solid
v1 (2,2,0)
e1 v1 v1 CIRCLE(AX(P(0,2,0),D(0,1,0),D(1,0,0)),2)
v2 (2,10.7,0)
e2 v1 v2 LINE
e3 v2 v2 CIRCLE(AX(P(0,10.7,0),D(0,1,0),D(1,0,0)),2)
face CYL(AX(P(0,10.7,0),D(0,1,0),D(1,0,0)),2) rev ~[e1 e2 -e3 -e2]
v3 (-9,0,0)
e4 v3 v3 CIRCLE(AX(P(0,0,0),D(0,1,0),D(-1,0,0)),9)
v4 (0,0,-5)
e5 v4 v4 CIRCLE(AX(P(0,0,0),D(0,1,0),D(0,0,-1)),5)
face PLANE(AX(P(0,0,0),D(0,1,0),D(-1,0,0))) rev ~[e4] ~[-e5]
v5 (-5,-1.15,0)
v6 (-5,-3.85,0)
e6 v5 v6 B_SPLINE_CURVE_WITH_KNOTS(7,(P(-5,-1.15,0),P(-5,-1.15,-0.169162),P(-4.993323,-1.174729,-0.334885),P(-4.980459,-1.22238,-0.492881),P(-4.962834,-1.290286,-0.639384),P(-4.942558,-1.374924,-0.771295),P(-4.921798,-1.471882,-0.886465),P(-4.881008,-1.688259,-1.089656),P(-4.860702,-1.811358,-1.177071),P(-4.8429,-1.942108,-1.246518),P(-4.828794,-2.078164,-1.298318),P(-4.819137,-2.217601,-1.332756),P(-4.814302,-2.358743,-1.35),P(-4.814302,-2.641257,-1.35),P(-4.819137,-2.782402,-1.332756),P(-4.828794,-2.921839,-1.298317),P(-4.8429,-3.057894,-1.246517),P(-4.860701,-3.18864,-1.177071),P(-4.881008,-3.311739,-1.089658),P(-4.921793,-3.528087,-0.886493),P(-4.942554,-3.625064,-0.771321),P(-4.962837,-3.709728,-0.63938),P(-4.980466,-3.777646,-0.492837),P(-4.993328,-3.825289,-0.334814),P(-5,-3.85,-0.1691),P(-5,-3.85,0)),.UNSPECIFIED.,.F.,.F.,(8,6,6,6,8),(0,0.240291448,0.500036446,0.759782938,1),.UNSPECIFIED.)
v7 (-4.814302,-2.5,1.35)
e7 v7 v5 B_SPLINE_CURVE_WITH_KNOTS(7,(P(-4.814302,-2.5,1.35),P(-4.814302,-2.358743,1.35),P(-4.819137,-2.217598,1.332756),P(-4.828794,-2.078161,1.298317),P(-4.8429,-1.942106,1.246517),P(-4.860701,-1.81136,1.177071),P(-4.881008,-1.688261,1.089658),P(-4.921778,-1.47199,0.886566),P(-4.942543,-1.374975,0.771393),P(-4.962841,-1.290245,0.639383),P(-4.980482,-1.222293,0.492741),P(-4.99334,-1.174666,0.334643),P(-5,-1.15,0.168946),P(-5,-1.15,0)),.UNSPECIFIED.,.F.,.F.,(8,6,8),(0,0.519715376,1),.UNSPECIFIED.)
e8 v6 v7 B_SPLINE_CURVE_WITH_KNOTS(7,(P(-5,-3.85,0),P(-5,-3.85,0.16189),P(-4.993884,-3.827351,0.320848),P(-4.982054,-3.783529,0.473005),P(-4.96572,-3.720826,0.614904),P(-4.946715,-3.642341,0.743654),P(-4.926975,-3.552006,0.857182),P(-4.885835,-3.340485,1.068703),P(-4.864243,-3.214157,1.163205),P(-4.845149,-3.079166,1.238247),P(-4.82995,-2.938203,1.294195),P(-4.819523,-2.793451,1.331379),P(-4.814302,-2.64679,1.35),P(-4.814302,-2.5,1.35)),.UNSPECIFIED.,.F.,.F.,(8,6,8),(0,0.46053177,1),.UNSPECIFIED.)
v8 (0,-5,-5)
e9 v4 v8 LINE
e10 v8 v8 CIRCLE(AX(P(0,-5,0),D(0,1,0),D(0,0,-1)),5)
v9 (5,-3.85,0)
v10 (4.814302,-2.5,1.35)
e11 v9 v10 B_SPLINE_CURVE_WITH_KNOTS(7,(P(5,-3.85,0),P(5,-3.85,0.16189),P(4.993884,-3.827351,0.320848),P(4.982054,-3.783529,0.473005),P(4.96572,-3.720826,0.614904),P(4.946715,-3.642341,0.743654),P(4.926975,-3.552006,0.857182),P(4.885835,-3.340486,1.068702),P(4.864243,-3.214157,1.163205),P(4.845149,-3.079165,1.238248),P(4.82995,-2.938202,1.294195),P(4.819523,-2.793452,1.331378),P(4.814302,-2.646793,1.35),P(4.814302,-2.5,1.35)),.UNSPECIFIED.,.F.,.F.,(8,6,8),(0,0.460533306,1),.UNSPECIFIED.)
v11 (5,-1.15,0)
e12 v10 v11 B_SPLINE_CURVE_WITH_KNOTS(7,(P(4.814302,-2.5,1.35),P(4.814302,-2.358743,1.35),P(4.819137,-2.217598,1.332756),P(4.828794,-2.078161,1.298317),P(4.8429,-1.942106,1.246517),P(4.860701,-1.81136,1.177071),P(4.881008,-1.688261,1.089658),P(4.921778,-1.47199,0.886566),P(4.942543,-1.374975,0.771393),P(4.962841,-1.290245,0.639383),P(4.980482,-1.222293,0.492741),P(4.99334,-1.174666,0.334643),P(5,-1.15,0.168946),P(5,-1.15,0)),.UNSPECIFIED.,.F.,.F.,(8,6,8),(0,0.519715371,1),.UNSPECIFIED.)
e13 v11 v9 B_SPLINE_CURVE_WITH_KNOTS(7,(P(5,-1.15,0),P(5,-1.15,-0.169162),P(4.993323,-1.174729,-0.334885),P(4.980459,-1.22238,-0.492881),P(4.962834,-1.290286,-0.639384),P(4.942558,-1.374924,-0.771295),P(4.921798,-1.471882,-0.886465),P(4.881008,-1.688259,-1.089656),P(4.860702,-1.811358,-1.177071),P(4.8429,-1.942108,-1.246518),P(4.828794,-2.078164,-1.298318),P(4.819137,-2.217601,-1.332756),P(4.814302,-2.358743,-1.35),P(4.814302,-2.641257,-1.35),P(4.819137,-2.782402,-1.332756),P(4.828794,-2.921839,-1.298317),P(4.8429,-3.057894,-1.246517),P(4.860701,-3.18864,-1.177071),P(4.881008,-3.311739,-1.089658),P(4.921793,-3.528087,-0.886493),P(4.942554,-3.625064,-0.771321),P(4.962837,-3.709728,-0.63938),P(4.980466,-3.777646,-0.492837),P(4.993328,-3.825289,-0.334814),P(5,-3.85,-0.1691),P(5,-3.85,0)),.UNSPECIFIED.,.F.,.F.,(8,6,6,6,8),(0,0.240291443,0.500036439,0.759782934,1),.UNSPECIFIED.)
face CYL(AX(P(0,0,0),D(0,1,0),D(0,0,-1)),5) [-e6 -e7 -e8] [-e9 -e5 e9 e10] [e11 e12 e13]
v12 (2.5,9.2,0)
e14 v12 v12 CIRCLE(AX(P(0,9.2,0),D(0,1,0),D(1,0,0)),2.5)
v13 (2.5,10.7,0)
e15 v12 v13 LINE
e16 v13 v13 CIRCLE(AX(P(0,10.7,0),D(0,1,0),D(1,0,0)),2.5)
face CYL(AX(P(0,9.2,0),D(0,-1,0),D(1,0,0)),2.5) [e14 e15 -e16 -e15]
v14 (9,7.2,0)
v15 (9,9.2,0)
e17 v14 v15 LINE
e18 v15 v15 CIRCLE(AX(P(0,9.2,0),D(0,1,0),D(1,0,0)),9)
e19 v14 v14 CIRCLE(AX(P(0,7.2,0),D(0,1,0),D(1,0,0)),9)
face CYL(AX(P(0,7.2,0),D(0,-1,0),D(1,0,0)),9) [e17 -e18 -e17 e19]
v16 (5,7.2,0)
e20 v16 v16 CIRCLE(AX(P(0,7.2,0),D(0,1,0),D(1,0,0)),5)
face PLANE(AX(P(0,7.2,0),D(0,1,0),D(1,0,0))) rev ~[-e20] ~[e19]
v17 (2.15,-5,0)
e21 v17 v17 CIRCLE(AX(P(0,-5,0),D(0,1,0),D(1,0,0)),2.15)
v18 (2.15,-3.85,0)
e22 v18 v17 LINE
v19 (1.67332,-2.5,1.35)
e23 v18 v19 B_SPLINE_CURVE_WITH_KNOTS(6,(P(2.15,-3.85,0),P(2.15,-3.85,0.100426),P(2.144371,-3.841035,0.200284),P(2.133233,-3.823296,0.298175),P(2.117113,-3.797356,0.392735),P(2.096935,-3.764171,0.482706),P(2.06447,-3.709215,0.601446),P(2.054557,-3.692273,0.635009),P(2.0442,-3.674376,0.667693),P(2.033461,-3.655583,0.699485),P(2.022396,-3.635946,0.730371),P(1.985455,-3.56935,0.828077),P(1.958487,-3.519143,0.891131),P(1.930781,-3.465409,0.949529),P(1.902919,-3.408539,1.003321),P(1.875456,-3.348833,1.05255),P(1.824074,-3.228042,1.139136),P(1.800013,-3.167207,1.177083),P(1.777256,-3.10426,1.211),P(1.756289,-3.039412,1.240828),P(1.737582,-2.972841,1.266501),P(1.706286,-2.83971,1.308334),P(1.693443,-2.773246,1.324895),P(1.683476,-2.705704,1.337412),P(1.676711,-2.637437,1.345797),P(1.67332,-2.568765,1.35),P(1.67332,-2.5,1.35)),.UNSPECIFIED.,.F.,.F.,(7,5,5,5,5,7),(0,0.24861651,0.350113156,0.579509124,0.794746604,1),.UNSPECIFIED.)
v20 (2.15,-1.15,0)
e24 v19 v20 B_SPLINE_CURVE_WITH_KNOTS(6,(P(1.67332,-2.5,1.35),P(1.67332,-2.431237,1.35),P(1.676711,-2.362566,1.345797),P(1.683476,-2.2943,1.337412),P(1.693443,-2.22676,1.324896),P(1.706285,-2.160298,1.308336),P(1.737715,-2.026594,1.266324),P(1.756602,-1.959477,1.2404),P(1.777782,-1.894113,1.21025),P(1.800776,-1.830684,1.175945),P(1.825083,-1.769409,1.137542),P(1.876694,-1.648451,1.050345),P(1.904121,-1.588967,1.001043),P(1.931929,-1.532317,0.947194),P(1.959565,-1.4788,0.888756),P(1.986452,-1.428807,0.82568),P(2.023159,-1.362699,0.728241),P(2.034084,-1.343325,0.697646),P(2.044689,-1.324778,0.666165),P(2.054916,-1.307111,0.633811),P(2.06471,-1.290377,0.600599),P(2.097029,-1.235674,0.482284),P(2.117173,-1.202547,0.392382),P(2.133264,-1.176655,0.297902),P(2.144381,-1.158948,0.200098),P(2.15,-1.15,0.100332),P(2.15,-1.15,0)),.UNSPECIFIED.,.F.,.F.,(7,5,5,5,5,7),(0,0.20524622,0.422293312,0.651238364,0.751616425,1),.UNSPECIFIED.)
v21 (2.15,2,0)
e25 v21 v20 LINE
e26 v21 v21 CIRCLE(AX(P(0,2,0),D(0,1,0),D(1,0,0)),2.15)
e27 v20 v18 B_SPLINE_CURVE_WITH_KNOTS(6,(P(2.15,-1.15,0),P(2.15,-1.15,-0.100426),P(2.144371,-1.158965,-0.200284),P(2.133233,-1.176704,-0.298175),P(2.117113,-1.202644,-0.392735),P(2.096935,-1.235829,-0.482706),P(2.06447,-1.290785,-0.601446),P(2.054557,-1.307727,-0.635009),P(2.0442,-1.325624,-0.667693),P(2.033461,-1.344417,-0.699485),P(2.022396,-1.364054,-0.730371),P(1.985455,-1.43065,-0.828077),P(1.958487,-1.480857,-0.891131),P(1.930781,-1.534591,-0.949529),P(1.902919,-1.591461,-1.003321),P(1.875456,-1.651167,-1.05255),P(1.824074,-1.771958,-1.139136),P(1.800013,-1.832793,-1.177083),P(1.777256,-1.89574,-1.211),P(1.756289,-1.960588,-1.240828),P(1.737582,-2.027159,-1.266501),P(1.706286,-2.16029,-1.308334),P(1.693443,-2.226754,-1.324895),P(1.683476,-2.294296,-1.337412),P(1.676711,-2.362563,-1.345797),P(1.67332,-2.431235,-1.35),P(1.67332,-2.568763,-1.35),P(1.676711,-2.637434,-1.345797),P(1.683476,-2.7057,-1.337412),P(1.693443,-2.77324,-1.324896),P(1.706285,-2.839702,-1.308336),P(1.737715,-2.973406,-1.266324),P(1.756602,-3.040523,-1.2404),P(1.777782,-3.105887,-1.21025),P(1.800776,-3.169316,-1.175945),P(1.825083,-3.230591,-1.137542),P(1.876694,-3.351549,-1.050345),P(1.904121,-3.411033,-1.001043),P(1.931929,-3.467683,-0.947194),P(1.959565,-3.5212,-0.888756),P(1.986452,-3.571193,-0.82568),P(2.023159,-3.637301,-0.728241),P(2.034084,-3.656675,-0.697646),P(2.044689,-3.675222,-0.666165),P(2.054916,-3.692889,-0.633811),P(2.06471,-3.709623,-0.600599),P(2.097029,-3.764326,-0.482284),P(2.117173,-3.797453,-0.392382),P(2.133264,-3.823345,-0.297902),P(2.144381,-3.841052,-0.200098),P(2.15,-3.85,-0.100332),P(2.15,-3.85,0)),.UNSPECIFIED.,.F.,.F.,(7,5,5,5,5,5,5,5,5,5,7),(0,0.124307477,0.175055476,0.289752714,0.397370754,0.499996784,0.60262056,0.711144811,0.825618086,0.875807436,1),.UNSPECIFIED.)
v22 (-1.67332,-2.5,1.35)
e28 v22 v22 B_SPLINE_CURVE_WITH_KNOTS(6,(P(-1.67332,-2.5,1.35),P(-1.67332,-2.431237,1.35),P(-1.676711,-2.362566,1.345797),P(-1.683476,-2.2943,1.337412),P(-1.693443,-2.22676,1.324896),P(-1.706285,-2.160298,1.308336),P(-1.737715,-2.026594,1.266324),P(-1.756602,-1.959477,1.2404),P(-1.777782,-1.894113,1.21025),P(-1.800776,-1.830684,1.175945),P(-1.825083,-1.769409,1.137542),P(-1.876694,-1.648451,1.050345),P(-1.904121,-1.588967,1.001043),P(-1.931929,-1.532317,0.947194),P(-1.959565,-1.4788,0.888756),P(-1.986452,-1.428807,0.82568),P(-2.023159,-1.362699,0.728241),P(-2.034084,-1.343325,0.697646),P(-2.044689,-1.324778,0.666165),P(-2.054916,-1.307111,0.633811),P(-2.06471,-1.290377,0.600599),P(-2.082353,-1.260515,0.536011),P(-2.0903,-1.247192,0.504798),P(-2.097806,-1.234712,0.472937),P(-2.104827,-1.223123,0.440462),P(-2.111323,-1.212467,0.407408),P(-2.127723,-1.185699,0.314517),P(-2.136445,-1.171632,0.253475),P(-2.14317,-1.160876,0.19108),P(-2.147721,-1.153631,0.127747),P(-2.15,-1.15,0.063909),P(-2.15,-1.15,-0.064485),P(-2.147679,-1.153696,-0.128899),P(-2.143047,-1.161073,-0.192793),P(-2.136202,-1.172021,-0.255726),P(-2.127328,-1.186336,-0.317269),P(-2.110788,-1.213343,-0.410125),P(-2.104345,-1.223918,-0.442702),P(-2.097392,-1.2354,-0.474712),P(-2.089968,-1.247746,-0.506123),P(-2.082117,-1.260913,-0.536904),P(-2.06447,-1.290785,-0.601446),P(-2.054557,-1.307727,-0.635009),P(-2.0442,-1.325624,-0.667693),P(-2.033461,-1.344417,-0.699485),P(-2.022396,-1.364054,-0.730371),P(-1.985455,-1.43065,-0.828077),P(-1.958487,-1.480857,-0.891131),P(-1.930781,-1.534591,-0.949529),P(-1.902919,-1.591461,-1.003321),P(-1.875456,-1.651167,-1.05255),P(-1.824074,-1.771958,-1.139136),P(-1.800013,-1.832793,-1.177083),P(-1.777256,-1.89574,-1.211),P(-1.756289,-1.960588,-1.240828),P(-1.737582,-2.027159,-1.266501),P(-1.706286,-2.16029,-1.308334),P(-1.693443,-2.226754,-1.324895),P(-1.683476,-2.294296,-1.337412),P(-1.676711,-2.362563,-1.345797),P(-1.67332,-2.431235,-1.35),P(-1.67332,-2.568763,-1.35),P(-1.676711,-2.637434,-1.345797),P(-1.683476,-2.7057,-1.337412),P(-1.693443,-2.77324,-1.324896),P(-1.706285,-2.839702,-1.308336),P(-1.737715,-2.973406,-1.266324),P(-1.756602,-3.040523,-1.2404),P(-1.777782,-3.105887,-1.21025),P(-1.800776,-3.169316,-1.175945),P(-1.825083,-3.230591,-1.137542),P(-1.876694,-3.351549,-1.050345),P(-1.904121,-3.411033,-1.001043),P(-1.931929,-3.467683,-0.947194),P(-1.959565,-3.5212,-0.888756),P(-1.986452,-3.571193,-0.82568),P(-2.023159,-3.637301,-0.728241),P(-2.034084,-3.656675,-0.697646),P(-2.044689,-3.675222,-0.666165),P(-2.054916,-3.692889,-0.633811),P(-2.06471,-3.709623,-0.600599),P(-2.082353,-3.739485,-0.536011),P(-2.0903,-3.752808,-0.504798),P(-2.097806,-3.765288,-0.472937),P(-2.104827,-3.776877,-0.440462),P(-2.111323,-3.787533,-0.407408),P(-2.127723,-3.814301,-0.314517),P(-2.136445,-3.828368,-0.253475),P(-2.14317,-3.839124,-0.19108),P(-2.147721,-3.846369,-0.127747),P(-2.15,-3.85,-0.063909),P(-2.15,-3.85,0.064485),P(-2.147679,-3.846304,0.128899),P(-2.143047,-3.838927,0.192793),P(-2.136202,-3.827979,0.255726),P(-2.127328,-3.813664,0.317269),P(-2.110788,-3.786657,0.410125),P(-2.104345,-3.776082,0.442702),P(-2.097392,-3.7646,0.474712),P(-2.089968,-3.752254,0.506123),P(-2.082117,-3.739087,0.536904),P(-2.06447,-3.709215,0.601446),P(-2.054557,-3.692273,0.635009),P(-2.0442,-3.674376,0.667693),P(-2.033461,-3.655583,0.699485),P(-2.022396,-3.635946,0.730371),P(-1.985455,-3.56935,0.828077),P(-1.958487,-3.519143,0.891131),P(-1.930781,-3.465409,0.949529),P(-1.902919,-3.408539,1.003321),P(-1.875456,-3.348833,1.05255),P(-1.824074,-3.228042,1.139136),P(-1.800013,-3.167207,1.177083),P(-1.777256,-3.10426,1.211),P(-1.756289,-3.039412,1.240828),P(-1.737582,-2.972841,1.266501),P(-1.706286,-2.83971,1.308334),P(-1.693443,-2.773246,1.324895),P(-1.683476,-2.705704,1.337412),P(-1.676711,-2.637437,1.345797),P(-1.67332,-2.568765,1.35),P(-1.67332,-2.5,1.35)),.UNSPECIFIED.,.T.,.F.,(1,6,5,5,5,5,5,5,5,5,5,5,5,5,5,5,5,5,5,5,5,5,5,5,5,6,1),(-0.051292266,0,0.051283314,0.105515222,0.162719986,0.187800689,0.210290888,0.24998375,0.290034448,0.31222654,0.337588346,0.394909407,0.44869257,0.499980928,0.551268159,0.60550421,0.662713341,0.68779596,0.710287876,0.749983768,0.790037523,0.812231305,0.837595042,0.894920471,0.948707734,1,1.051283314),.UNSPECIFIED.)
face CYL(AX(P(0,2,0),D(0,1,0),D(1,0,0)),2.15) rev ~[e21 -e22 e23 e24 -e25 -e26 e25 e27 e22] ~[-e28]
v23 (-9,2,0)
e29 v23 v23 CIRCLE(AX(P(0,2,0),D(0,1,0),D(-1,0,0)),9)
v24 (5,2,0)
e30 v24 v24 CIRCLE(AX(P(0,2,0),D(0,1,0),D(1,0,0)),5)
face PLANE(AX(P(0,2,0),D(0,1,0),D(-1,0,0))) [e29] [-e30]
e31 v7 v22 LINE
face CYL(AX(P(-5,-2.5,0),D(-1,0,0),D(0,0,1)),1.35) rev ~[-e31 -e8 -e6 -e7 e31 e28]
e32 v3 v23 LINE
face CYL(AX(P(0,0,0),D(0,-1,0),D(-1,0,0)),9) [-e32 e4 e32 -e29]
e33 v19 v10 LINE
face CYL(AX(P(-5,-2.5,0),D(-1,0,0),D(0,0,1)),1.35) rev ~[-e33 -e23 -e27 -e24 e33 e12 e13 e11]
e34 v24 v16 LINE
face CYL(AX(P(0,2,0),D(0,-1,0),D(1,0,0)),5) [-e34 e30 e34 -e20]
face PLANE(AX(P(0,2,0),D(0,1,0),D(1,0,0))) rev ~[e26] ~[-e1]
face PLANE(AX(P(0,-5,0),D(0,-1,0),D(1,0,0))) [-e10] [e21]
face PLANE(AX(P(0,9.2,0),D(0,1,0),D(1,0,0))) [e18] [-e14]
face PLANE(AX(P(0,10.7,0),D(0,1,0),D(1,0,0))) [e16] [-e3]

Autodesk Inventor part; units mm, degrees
ref_plane "YZ Plane" through (0, 0, 0) normal (1, 0, 0) x (0, 1, 0)
ref_plane "XZ Plane" through (0, 0, 0) normal (0, 1, 0) x (-1, 0, 0)
ref_plane "XY Plane" through (0, 0, 0) normal (0, 0, 1) x (1, 0, 0)
sketch "Эскиз1" plane through (0, 0, 0) normal (0, 1, 0) x (-1, 0, 0)
  circle A0 centre (0, 0) radius 9
  dimension "d0" = 18
extrude "Выдавливание1" add sketch "Эскиз1" along normal blind 2
sketch "Эскиз5" plane through (0, 0, 0) normal (0, -1, 0) x (1, 0, 0)
  line L0 (5, -5) -> (-5, -5)
  line L1 (-5, -5) -> (-5, 5)
  line L2 (-5, 5) -> (5, 5)
  line L3 (5, 5) -> (5, -5)
  circle A0 centre (0, 0) radius 2
  dimension "d12" = 10
  dimension "d13" = 10
  dimension "d17" = 5
  dimension "d27" = 5
extrude "Выдавливание5" add sketch "Эскиз5" along normal blind 5
sketch "Эскиз6" plane through (-5, 0, -5) normal (-1, 0, 0) x (0, 0, 1)
  circle A0 centre (5, -2.5) radius 1.35
  line L0 (10, -5) -> (0, -5) projected
  line L1 (0, 0) -> (0, -5) projected
  point P0 (5, 0)
  point P1 (0, -2.5)
  dimension "d30" = 2.7
  dimension "d31" = 2.5
  dimension "d32" = 5
extrude "Выдавливание6" cut sketch "Эскиз6" against normal blind 15.75
fillet "Сопряжение1" radius 5 4 edges at (5, -2.5, 5) (-5, -2.5, 5) (-5, -2.5, -5) (5, -2.5, -5)
sketch "Эскиз8" plane through (0, 0, 0) normal (0, -1, 0) x (1, 0, 0)
  point P0 (0, 0)
sketch "Эскиз9" plane through (0, 2, 0) normal (0, 1, 0) x (1, 0, 0)
  circle A0 centre (0, 0) radius 2.15
  dimension "d44" = 4.3
extrude "Выдавливание8" cut sketch "Эскиз9" against normal blind 10
sketch "Эскиз11" plane through (0, 2, 0) normal (0, 1, 0) x (1, 0, 0)
  circle A0 centre (0, 0) radius 5
  dimension "d47" = 10
extrude "Выдавливание9" add sketch "Эскиз11" along normal blind 5.2
sketch "Эскиз12" plane through (0, 7.2, 0) normal (0, 1, 0) x (1, 0, 0)
  circle A0 centre (0, 0) radius 9
  dimension "d50" = 18
extrude "Выдавливание10" add sketch "Эскиз12" along normal blind 2
sketch "Эскиз13" plane through (0, 9.2, 0) normal (0, 1, 0) x (1, 0, 0)
  circle A0 centre (0, 0) radius 2
  dimension "d53" = 4
extrude "Выдавливание11" cut sketch "Эскиз13" against normal blind 17.75
sketch "Эскиз14" plane through (0, 9.2, 0) normal (0, 1, 0) x (1, 0, 0)
  circle A0 centre (0, 0) radius 2.5
  dimension "d56" = 5
extrude "Выдавливание12" add sketch "Эскиз14" along normal blind 1.5
sketch "Эскиз15" plane through (0, 10.7, 0) normal (0, 1, 0) x (1, 0, 0)
  circle A0 centre (0, 0) radius 2
  dimension "d59" = 4
extrude "Выдавливание13" cut sketch "Эскиз15" against normal blind 33.5
properties part number "koleso_rig"
